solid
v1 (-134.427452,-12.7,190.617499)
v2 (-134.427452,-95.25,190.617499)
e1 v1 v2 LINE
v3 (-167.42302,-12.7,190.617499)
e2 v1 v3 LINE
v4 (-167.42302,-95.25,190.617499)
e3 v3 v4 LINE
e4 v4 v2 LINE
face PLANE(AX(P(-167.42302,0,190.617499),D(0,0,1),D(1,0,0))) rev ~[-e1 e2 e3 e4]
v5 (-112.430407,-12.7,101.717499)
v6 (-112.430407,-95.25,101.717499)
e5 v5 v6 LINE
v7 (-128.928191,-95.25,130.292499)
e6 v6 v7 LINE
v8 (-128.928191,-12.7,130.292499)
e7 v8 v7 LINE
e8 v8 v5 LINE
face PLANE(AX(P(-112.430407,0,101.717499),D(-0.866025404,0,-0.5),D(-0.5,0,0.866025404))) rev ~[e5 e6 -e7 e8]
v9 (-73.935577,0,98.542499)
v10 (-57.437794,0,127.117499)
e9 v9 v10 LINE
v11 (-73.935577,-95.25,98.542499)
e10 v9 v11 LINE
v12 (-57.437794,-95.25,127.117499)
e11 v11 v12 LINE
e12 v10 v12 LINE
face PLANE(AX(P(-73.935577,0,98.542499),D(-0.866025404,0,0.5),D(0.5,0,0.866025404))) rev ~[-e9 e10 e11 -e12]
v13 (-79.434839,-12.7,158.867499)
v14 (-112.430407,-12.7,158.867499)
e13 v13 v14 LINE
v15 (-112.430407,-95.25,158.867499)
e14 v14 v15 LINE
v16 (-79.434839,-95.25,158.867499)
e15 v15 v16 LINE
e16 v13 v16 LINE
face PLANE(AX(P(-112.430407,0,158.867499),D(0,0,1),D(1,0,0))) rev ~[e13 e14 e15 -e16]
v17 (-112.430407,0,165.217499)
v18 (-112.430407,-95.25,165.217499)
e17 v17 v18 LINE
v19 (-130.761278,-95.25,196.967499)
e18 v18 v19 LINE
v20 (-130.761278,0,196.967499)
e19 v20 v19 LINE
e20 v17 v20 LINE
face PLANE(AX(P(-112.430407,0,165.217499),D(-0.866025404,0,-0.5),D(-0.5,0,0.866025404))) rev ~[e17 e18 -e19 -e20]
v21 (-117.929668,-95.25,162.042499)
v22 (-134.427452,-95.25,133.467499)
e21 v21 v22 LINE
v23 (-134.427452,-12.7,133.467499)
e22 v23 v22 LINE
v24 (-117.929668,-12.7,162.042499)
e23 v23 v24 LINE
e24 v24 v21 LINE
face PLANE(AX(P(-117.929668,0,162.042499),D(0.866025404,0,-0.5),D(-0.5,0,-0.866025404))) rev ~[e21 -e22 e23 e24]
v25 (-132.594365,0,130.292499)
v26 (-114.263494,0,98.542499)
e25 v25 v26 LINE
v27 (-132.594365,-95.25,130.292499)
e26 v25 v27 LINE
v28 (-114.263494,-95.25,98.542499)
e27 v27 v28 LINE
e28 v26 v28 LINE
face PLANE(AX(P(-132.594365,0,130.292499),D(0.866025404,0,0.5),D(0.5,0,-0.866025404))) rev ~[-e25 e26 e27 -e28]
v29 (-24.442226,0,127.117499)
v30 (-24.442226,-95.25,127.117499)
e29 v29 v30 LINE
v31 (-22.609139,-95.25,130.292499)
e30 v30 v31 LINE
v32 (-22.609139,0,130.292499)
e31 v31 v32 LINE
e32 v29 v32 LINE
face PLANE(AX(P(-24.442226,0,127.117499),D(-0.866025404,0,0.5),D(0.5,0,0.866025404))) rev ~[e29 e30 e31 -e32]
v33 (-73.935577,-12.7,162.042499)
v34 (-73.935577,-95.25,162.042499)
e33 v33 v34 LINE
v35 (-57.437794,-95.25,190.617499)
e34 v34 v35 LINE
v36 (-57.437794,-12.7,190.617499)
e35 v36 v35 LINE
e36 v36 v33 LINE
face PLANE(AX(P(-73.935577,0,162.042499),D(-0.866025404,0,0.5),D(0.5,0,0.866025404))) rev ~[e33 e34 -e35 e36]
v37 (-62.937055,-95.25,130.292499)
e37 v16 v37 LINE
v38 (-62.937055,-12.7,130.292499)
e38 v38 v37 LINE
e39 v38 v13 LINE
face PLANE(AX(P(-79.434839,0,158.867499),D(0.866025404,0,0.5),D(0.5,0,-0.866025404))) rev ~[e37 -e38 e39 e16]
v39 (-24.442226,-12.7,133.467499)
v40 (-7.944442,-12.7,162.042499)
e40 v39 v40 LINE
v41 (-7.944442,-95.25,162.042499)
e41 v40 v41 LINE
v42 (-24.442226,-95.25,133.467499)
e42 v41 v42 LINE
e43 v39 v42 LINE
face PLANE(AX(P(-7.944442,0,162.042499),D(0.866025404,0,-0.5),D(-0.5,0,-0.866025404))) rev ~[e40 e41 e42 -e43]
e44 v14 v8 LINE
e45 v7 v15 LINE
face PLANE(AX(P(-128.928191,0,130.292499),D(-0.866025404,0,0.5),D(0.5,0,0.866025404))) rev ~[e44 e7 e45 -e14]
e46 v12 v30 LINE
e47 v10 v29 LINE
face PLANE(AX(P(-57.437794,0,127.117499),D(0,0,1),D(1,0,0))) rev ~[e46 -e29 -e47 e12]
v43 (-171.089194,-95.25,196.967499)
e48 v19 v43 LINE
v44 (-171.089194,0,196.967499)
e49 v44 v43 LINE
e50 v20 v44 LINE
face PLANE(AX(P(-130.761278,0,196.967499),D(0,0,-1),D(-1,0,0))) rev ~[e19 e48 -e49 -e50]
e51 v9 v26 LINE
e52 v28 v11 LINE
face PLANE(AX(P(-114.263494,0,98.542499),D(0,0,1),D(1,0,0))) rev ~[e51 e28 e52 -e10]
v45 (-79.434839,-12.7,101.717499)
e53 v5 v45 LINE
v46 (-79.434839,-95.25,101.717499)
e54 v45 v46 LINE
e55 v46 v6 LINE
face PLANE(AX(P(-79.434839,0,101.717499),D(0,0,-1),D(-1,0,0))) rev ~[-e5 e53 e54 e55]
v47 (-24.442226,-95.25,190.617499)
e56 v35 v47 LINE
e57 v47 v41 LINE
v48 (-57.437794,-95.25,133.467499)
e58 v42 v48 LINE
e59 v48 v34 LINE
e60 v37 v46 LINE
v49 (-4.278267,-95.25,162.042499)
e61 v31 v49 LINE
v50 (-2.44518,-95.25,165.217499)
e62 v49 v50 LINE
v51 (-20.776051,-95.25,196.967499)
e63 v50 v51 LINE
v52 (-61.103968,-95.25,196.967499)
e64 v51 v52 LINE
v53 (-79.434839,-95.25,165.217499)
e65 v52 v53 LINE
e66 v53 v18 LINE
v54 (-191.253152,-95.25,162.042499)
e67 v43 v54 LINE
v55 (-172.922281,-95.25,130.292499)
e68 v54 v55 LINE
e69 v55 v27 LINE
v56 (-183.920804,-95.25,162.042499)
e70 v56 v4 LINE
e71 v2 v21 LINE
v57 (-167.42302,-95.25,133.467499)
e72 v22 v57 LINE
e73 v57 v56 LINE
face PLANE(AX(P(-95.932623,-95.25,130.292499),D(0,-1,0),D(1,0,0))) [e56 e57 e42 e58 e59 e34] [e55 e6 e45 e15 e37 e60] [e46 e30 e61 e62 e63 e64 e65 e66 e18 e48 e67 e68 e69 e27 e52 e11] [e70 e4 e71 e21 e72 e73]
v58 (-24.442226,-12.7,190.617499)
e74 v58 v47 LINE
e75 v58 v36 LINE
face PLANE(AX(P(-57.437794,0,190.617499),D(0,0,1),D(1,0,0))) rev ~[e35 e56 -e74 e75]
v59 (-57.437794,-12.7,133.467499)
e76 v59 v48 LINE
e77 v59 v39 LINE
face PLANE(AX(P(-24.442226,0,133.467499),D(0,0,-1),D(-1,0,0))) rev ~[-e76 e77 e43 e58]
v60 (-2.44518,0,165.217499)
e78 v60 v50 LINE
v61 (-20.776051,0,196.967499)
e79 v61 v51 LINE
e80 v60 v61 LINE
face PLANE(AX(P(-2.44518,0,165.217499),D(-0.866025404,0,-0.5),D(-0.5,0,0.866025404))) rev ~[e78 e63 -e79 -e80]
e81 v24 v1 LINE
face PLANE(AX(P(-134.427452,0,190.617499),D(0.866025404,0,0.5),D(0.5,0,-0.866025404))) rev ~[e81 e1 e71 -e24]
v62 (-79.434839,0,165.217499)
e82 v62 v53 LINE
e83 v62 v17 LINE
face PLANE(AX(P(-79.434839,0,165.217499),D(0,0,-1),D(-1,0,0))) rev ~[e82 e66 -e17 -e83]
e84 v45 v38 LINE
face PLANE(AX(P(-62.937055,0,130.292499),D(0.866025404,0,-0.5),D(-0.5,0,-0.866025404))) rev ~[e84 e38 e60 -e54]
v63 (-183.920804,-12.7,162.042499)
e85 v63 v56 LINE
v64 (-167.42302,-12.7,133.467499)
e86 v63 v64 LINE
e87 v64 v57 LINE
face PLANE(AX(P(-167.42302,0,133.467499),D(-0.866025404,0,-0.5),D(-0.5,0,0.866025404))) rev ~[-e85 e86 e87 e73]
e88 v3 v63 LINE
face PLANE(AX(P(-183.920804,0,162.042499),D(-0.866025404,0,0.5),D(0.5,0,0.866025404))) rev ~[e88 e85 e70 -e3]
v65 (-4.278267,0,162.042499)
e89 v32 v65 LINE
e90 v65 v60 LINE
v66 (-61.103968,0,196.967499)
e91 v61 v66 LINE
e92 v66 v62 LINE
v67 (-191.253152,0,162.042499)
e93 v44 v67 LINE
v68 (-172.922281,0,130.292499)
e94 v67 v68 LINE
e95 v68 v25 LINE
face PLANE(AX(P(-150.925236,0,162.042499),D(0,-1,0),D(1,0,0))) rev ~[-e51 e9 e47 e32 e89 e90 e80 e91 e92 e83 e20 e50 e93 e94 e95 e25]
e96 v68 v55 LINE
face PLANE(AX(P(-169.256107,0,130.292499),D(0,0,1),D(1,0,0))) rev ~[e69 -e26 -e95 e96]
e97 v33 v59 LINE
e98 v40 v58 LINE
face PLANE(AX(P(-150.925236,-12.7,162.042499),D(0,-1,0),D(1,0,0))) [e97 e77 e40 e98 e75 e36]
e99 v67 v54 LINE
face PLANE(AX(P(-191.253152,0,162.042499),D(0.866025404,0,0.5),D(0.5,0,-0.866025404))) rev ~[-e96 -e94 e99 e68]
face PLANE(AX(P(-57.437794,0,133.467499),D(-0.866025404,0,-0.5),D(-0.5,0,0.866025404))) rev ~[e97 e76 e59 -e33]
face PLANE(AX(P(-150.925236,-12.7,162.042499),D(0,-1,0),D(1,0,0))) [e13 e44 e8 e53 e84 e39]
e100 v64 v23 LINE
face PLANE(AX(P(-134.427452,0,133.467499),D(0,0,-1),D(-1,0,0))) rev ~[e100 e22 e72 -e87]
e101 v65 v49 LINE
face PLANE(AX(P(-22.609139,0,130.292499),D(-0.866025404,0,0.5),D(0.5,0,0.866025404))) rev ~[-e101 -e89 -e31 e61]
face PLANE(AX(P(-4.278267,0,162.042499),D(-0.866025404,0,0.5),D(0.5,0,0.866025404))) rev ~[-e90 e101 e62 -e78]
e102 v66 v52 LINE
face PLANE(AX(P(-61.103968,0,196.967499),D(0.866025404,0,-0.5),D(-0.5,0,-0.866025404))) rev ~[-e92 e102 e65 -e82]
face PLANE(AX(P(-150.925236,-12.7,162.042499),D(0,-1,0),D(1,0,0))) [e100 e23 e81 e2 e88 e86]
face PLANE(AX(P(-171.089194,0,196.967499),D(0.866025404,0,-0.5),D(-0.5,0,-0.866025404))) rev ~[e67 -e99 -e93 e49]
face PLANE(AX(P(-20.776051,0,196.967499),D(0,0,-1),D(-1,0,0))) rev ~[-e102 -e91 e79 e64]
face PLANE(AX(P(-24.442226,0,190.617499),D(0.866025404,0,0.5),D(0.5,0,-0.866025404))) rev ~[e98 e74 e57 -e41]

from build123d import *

# Parameters (mm, degrees)
F1_DEPTH = 12.7
F2_DEPTH = 95.25


# Not quite as in the source:
# - a feature names something its author has since deleted; it is built from what else it names


with BuildPart() as f1:
    # F0 (on Front) → F1 (new body)
    with BuildSketch(Plane.XZ):
        Polygon((-169.2561069029, 130.2924993012), (-132.5943648094, 130.2924993012), (-114.2634937626, 162.0424993012), (-132.5943648094, 193.7924993012), (-169.2561069029, 193.7924993012), (-187.5869779497, 162.0424993012), align=None)
        Polygon((-167.4230197982, 133.4674993012), (-183.9208037403, 162.0424993012), (-167.4230197982, 190.6174993012), (-134.427451914, 190.6174993012), (-117.929667972, 162.0424993012), (-134.427451914, 133.4674993012), align=None, mode=Mode.SUBTRACT)
        Polygon((-77.6017516691, 162.0424993012), (-59.2708806223, 130.2924993012), (-27.4963065598, 130.2924993012), (-22.6091385287, 130.2924993012), (-4.278267482, 162.0424993012), (-22.6091385287, 193.7924993012), (-59.2708806223, 193.7924993012), align=None)
        Polygon((-57.4377935176, 133.4674993012), (-73.9355774597, 162.0424993012), (-57.4377935176, 190.6174993012), (-24.4422256334, 190.6174993012), (-7.9444416913, 162.0424993012), (-24.4422256334, 133.4674993012), align=None, mode=Mode.SUBTRACT)
        Polygon((-132.5943648094, 130.2924993012), (-114.2634937626, 98.5424993012), (-77.6017516691, 98.5424993012), (-59.2708806223, 130.2924993012), (-77.6017516691, 162.0424993012), (-114.2634937626, 162.0424993012), align=None)
        Polygon((-112.4304066579, 101.7174993012), (-128.9281906, 130.2924993012), (-112.4304066579, 158.8674993012), (-79.4348387737, 158.8674993012), (-62.9370548316, 130.2924993012), (-79.4348387737, 101.7174993012), align=None, mode=Mode.SUBTRACT)
        Polygon((-57.4377935176, 190.6174993012), (-73.9355774597, 162.0424993012), (-57.4377935176, 133.4674993012), (-24.4422256334, 133.4674993012), (-7.9444416913, 162.0424993012), (-24.4422256334, 190.6174993012), align=None)
        Polygon((-112.4304066579, 158.8674993012), (-128.9281906, 130.2924993012), (-112.4304066579, 101.7174993012), (-79.4348387737, 101.7174993012), (-62.9370548316, 130.2924993012), (-79.4348387737, 158.8674993012), align=None)
        Polygon((-167.4230197982, 190.6174993012), (-183.9208037403, 162.0424993012), (-167.4230197982, 133.4674993012), (-134.427451914, 133.4674993012), (-117.929667972, 162.0424993012), (-134.427451914, 190.6174993012), align=None)
    extrude(amount=F1_DEPTH)

    # F0 (on Front) → F2 (join)
    with BuildSketch(Plane.XZ):
        Polygon((-132.5943648094, 130.2924993012), (-114.2634937626, 98.5424993012), (-77.6017516691, 98.5424993012), (-59.2708806223, 130.2924993012), (-77.6017516691, 162.0424993012), (-114.2634937626, 162.0424993012), align=None)
        Polygon((-112.4304066579, 101.7174993012), (-128.9281906, 130.2924993012), (-112.4304066579, 158.8674993012), (-79.4348387737, 158.8674993012), (-62.9370548316, 130.2924993012), (-79.4348387737, 101.7174993012), align=None, mode=Mode.SUBTRACT)
        Polygon((-59.2708806223, 130.2924993012), (-77.6017516691, 98.5424993012), (-73.9355774597, 98.5424993012), (-57.4377935176, 127.1174993012), (-24.4422256334, 127.1174993012), (-22.6091385287, 130.2924993012), (-27.4963065598, 130.2924993012), align=None)
        Polygon((-169.2561069029, 130.2924993012), (-132.5943648094, 130.2924993012), (-114.2634937626, 162.0424993012), (-132.5943648094, 193.7924993012), (-169.2561069029, 193.7924993012), (-187.5869779497, 162.0424993012), align=None)
        Polygon((-167.4230197982, 133.4674993012), (-183.9208037403, 162.0424993012), (-167.4230197982, 190.6174993012), (-134.427451914, 190.6174993012), (-117.929667972, 162.0424993012), (-134.427451914, 133.4674993012), align=None, mode=Mode.SUBTRACT)
        Polygon((-77.6017516691, 162.0424993012), (-59.2708806223, 130.2924993012), (-27.4963065598, 130.2924993012), (-22.6091385287, 130.2924993012), (-4.278267482, 162.0424993012), (-22.6091385287, 193.7924993012), (-59.2708806223, 193.7924993012), align=None)
        Polygon((-57.4377935176, 133.4674993012), (-73.9355774597, 162.0424993012), (-57.4377935176, 190.6174993012), (-24.4422256334, 190.6174993012), (-7.9444416913, 162.0424993012), (-24.4422256334, 133.4674993012), align=None, mode=Mode.SUBTRACT)
        Polygon((-172.9222811123, 130.2924993012), (-169.2561069029, 130.2924993012), (-187.5869779497, 162.0424993012), (-169.2561069029, 193.7924993012), (-132.5943648094, 193.7924993012), (-114.2634937626, 162.0424993012), (-77.6017516691, 162.0424993012), (-59.2708806223, 193.7924993012), (-22.6091385287, 193.7924993012), (-4.278267482, 162.0424993012), (-2.4451803773, 165.2174993012), (-20.7760514241, 196.9674993012), (-61.103967727, 196.9674993012), (-79.4348387737, 165.2174993012), (-112.4304066579, 165.2174993012), (-130.7612777034, 196.967499299), (-171.0891940088, 196.967499299), (-191.253152159, 162.0424993012), align=None)
    extrude(amount=F2_DEPTH)


solid = f1.part
